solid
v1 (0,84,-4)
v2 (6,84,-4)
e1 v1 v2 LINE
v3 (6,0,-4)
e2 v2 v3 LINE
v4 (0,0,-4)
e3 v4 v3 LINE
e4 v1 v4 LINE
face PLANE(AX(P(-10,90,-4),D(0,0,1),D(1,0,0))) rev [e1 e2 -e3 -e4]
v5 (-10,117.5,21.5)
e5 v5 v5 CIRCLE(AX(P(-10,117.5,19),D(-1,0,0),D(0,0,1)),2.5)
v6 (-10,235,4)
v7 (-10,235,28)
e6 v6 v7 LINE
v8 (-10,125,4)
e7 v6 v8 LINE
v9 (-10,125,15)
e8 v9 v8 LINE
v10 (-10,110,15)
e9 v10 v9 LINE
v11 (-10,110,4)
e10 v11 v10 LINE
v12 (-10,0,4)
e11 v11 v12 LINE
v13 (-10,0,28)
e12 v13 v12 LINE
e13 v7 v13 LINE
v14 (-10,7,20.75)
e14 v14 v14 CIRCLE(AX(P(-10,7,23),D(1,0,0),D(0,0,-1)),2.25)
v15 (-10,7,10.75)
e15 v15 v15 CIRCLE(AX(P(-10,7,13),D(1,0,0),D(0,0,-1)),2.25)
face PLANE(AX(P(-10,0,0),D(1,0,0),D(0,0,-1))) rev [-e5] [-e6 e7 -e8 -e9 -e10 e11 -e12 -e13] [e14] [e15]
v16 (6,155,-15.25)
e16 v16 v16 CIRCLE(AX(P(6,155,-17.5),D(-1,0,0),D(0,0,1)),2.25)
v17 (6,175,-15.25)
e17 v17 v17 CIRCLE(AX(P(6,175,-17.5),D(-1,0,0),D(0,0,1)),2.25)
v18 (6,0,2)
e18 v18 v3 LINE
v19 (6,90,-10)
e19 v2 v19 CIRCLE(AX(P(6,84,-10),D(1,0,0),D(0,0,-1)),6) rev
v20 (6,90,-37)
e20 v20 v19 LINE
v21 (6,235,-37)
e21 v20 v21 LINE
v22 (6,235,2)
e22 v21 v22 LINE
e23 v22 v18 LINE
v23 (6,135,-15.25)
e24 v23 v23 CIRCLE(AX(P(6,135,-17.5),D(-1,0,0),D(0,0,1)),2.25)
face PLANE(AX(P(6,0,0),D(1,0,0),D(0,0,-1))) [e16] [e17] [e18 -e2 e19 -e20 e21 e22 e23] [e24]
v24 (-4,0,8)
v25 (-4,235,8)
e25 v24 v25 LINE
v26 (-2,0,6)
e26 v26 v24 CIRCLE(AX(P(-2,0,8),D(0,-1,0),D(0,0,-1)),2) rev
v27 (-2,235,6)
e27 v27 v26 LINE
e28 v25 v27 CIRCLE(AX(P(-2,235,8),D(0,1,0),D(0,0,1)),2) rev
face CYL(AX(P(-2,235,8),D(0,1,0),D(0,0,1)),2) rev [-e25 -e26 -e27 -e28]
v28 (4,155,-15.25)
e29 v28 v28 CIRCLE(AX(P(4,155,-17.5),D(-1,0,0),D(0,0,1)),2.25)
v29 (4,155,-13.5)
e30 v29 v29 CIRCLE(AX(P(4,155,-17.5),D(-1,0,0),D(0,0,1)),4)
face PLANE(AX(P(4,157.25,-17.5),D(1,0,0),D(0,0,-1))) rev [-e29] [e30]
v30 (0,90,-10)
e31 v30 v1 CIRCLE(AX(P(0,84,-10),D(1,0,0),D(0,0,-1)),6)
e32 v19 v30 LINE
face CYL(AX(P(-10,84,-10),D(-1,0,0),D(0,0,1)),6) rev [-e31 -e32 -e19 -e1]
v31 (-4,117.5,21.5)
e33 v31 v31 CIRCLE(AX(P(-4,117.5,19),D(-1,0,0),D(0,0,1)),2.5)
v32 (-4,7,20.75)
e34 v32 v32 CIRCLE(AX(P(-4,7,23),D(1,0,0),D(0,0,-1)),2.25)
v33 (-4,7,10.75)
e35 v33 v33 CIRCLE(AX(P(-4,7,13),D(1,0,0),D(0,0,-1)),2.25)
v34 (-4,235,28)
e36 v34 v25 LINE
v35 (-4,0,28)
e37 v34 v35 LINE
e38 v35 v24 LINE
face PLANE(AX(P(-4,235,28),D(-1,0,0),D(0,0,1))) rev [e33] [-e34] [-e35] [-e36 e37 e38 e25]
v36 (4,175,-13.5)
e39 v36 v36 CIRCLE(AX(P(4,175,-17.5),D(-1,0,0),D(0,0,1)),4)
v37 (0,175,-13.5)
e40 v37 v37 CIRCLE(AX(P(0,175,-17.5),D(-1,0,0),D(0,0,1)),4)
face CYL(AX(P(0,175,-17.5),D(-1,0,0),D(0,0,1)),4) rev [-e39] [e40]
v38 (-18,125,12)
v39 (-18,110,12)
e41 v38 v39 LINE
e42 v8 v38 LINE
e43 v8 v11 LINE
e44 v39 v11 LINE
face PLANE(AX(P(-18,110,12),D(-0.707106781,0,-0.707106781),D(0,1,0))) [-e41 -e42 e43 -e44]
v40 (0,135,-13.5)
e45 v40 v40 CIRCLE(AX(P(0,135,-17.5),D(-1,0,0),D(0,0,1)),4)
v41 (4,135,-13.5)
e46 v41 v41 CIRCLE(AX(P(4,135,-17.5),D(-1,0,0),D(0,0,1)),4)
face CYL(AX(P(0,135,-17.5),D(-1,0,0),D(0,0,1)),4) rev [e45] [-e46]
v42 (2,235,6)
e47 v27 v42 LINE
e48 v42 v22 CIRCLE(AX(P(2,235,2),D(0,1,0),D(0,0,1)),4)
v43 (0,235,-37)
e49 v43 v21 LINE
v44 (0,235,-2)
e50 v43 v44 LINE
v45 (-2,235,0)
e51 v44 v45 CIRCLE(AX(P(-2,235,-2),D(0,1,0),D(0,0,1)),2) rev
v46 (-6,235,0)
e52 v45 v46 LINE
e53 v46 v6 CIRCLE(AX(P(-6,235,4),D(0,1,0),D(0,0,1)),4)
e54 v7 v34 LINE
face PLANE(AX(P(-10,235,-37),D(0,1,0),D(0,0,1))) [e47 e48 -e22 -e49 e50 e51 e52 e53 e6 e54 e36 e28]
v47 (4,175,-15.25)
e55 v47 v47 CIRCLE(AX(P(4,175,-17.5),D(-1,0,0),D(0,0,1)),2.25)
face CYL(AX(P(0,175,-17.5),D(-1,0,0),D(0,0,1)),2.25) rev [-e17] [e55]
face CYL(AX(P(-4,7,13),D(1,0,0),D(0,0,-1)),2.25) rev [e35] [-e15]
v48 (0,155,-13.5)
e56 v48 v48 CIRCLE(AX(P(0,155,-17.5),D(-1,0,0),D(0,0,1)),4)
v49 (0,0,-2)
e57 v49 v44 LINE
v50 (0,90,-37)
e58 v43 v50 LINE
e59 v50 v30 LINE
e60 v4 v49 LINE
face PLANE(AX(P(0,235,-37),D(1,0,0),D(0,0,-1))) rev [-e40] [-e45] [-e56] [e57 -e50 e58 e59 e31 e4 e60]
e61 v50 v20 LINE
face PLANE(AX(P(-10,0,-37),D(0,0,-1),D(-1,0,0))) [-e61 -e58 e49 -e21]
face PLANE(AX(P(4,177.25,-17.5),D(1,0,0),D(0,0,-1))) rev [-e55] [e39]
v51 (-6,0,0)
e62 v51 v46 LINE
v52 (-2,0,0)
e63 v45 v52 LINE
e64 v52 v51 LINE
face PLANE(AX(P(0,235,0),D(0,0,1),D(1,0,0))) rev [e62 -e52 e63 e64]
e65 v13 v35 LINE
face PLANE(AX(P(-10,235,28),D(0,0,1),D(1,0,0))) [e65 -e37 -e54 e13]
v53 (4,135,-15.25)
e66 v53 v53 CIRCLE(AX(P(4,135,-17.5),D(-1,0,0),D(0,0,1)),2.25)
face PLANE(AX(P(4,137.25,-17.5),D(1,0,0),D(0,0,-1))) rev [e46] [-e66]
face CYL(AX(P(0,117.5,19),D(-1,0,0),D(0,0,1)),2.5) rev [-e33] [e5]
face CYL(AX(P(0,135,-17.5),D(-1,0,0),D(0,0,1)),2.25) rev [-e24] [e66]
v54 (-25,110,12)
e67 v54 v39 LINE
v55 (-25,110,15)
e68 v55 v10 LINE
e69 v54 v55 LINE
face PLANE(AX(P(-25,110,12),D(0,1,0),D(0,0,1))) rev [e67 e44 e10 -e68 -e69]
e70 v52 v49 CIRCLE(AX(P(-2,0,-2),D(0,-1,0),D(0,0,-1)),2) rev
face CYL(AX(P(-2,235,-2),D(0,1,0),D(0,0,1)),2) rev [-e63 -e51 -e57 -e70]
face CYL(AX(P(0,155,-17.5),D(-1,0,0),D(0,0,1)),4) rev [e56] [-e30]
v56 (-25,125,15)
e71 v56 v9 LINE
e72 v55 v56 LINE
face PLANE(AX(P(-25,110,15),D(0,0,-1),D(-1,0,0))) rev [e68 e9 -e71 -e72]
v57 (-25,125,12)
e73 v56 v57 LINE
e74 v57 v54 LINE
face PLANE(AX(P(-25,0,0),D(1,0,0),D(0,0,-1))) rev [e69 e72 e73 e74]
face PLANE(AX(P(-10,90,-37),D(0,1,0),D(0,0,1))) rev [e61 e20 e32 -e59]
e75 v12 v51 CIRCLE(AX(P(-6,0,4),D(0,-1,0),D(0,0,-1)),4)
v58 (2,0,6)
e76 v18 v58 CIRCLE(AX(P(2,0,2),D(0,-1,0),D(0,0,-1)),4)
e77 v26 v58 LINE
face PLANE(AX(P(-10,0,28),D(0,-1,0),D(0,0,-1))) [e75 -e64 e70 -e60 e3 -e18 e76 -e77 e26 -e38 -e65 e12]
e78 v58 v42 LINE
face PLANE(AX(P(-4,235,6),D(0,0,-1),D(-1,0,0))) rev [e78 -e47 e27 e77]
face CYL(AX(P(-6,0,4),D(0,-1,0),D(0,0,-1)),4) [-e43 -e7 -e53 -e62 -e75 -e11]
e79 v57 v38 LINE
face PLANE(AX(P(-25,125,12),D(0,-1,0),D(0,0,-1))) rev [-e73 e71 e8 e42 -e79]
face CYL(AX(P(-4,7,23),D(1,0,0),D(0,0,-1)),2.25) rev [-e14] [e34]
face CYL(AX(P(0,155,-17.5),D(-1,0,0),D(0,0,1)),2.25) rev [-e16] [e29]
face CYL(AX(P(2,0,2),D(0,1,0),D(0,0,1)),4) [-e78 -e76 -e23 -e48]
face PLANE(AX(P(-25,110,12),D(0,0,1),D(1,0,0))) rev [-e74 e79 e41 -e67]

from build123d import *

# Parameters (mm, degrees)
SCHIZZO1_W                                           = 65
SCHIZZO1_H                                           = 235
ESTRUSIONE_ESTRUSIONE1_DEPTH                         = 16
SCHIZZO2_W                                           = 10
SCHIZZO2_H                                           = 37
TAGLIO_ESTRUSIONE1_DEPTH                             = 239.105018847
SCHIZZO3_W                                           = 33
SCHIZZO3_H                                           = 90
TAGLIO_ESTRUSIONE2_DEPTH                             = 239.432380351
SCHIZZO4_W                                           = 10
SCHIZZO4_H                                           = 22
TAGLIO_ESTRUSIONE3_DEPTH                             = 239.105018847
FORO_LAMATO_PER_VITE_M4_A_TESTA_ESAGONAL_D           = 4.5
FORO_LAMATO_PER_VITE_M4_A_TESTA_ESAGONAL_CBORE_D     = 8
FORO_LAMATO_PER_VITE_M4_A_TESTA_ESAGONAL_CBORE_DEPTH = 4
RACCORDO1_R                                          = 2
RACCORDO2_R                                          = 4
RACCORDO3_R                                          = 6
FORO_PER_VITE_M4_1_D                                 = 4.5
FORO_PER_VITE_M4_1_DEPTH                             = 188
FORO_PER_VITE_M4_1_TIP                               = 1.351936393
SCHIZZO10_W                                          = 3
SCHIZZO10_H                                          = 15
ESTRUSIONE_ESTRUSIONE2_DEPTH                         = 15
SCHIZZO11_R                                          = 2.5
TAGLIO_ESTRUSIONE4_DEPTH                             = 10
SMUSSO1_SIZE                                         = 8


with BuildPart() as part:
    # Schizzo1 → Estrusione-Estrusione1 (new body)
    with BuildSketch(Plane(origin=(6, 0, 0), x_dir=(0, 0, -1), z_dir=(1, 0, 0))):
        with Locations((4.5, 117.5)):
            Rectangle(SCHIZZO1_W, SCHIZZO1_H)
    extrude(amount=-ESTRUSIONE_ESTRUSIONE1_DEPTH)

    # Schizzo2 → Taglio-Estrusione1 (cut, through all)
    with BuildSketch(Plane.XZ):
        with Locations((-5, -18.5)):
            Rectangle(SCHIZZO2_W, SCHIZZO2_H)
    extrude(amount=-TAGLIO_ESTRUSIONE1_DEPTH, mode=Mode.SUBTRACT)

    # Schizzo3 → Taglio-Estrusione2 (cut, through all)
    with BuildSketch(Plane(origin=(6, 0, 0), x_dir=(0, 0, -1), z_dir=(1, 0, 0))):
        with Locations((20.5, 45)):
            Rectangle(SCHIZZO3_W, SCHIZZO3_H)
    extrude(amount=-TAGLIO_ESTRUSIONE2_DEPTH, mode=Mode.SUBTRACT)

    # Schizzo4 → Taglio-Estrusione3 (cut, through all)
    with BuildSketch(Plane.XZ):
        with Locations((1, 17)):
            Rectangle(SCHIZZO4_W, SCHIZZO4_H)
    extrude(amount=-TAGLIO_ESTRUSIONE3_DEPTH, mode=Mode.SUBTRACT)

    # Foro lamato per Vite M4 a testa esagonale-1 (through all)
    with Locations(Plane.ZY):
        with Locations((-17.5, 175), (-17.5, 155), (-17.5, 135)):
            CounterBoreHole(FORO_LAMATO_PER_VITE_M4_A_TESTA_ESAGONAL_D / 2, FORO_LAMATO_PER_VITE_M4_A_TESTA_ESAGONAL_CBORE_D / 2, FORO_LAMATO_PER_VITE_M4_A_TESTA_ESAGONAL_CBORE_DEPTH)

    # Raccordo1
    raccordo1_edges = [part.edges().sort_by_distance(p)[0] for p in [
        (0, 117.5, 0),
        (-4, 117.5, 6),
    ]]
    fillet(raccordo1_edges, radius=RACCORDO1_R)

    # Raccordo2
    raccordo2_edges = [part.edges().sort_by_distance(p)[0] for p in [
        (-10, 117.5, 0),
        (6, 117.5, 6),
    ]]
    fillet(raccordo2_edges, radius=RACCORDO2_R)

    # Raccordo3
    raccordo3_edges = [part.edges().sort_by_distance(p)[0] for p in [
        (3, 90, -4),
    ]]
    fillet(raccordo3_edges, radius=RACCORDO3_R)

    # Foro per Vite M4-1
    with Locations(Plane(origin=(-4, 0, 0), x_dir=(0, 0, -1), z_dir=(1, 0, 0))):
        with Locations((-23, 7), (-13, 7)):
            Hole(FORO_PER_VITE_M4_1_D / 2, depth=FORO_PER_VITE_M4_1_DEPTH)
            with Locations((0, 0, -(FORO_PER_VITE_M4_1_DEPTH + FORO_PER_VITE_M4_1_TIP / 2))):  # 118° drill point
                Cone(0, FORO_PER_VITE_M4_1_D / 2, FORO_PER_VITE_M4_1_TIP, mode=Mode.SUBTRACT)

    # Schizzo10 → Estrusione-Estrusione2 (add)
    with BuildSketch(Plane.ZY.offset(10)):
        with Locations((13.5, 117.5)):
            Rectangle(SCHIZZO10_W, SCHIZZO10_H)
    extrude(amount=ESTRUSIONE_ESTRUSIONE2_DEPTH)

    # Schizzo11 → Taglio-Estrusione4 (cut)
    with BuildSketch(Plane.ZY.offset(10)):
        with Locations((19, 117.5)):
            Circle(SCHIZZO11_R)
    extrude(amount=-TAGLIO_ESTRUSIONE4_DEPTH, mode=Mode.SUBTRACT)

    # Smusso1
    smusso1_edges = [part.edges().sort_by_distance(p)[0] for p in [
        (-10, 117.5, 12),
    ]]
    chamfer(smusso1_edges, length=SMUSSO1_SIZE - 0.0001)  # a hair under: the kernel refuses the full size


solid = part.part
